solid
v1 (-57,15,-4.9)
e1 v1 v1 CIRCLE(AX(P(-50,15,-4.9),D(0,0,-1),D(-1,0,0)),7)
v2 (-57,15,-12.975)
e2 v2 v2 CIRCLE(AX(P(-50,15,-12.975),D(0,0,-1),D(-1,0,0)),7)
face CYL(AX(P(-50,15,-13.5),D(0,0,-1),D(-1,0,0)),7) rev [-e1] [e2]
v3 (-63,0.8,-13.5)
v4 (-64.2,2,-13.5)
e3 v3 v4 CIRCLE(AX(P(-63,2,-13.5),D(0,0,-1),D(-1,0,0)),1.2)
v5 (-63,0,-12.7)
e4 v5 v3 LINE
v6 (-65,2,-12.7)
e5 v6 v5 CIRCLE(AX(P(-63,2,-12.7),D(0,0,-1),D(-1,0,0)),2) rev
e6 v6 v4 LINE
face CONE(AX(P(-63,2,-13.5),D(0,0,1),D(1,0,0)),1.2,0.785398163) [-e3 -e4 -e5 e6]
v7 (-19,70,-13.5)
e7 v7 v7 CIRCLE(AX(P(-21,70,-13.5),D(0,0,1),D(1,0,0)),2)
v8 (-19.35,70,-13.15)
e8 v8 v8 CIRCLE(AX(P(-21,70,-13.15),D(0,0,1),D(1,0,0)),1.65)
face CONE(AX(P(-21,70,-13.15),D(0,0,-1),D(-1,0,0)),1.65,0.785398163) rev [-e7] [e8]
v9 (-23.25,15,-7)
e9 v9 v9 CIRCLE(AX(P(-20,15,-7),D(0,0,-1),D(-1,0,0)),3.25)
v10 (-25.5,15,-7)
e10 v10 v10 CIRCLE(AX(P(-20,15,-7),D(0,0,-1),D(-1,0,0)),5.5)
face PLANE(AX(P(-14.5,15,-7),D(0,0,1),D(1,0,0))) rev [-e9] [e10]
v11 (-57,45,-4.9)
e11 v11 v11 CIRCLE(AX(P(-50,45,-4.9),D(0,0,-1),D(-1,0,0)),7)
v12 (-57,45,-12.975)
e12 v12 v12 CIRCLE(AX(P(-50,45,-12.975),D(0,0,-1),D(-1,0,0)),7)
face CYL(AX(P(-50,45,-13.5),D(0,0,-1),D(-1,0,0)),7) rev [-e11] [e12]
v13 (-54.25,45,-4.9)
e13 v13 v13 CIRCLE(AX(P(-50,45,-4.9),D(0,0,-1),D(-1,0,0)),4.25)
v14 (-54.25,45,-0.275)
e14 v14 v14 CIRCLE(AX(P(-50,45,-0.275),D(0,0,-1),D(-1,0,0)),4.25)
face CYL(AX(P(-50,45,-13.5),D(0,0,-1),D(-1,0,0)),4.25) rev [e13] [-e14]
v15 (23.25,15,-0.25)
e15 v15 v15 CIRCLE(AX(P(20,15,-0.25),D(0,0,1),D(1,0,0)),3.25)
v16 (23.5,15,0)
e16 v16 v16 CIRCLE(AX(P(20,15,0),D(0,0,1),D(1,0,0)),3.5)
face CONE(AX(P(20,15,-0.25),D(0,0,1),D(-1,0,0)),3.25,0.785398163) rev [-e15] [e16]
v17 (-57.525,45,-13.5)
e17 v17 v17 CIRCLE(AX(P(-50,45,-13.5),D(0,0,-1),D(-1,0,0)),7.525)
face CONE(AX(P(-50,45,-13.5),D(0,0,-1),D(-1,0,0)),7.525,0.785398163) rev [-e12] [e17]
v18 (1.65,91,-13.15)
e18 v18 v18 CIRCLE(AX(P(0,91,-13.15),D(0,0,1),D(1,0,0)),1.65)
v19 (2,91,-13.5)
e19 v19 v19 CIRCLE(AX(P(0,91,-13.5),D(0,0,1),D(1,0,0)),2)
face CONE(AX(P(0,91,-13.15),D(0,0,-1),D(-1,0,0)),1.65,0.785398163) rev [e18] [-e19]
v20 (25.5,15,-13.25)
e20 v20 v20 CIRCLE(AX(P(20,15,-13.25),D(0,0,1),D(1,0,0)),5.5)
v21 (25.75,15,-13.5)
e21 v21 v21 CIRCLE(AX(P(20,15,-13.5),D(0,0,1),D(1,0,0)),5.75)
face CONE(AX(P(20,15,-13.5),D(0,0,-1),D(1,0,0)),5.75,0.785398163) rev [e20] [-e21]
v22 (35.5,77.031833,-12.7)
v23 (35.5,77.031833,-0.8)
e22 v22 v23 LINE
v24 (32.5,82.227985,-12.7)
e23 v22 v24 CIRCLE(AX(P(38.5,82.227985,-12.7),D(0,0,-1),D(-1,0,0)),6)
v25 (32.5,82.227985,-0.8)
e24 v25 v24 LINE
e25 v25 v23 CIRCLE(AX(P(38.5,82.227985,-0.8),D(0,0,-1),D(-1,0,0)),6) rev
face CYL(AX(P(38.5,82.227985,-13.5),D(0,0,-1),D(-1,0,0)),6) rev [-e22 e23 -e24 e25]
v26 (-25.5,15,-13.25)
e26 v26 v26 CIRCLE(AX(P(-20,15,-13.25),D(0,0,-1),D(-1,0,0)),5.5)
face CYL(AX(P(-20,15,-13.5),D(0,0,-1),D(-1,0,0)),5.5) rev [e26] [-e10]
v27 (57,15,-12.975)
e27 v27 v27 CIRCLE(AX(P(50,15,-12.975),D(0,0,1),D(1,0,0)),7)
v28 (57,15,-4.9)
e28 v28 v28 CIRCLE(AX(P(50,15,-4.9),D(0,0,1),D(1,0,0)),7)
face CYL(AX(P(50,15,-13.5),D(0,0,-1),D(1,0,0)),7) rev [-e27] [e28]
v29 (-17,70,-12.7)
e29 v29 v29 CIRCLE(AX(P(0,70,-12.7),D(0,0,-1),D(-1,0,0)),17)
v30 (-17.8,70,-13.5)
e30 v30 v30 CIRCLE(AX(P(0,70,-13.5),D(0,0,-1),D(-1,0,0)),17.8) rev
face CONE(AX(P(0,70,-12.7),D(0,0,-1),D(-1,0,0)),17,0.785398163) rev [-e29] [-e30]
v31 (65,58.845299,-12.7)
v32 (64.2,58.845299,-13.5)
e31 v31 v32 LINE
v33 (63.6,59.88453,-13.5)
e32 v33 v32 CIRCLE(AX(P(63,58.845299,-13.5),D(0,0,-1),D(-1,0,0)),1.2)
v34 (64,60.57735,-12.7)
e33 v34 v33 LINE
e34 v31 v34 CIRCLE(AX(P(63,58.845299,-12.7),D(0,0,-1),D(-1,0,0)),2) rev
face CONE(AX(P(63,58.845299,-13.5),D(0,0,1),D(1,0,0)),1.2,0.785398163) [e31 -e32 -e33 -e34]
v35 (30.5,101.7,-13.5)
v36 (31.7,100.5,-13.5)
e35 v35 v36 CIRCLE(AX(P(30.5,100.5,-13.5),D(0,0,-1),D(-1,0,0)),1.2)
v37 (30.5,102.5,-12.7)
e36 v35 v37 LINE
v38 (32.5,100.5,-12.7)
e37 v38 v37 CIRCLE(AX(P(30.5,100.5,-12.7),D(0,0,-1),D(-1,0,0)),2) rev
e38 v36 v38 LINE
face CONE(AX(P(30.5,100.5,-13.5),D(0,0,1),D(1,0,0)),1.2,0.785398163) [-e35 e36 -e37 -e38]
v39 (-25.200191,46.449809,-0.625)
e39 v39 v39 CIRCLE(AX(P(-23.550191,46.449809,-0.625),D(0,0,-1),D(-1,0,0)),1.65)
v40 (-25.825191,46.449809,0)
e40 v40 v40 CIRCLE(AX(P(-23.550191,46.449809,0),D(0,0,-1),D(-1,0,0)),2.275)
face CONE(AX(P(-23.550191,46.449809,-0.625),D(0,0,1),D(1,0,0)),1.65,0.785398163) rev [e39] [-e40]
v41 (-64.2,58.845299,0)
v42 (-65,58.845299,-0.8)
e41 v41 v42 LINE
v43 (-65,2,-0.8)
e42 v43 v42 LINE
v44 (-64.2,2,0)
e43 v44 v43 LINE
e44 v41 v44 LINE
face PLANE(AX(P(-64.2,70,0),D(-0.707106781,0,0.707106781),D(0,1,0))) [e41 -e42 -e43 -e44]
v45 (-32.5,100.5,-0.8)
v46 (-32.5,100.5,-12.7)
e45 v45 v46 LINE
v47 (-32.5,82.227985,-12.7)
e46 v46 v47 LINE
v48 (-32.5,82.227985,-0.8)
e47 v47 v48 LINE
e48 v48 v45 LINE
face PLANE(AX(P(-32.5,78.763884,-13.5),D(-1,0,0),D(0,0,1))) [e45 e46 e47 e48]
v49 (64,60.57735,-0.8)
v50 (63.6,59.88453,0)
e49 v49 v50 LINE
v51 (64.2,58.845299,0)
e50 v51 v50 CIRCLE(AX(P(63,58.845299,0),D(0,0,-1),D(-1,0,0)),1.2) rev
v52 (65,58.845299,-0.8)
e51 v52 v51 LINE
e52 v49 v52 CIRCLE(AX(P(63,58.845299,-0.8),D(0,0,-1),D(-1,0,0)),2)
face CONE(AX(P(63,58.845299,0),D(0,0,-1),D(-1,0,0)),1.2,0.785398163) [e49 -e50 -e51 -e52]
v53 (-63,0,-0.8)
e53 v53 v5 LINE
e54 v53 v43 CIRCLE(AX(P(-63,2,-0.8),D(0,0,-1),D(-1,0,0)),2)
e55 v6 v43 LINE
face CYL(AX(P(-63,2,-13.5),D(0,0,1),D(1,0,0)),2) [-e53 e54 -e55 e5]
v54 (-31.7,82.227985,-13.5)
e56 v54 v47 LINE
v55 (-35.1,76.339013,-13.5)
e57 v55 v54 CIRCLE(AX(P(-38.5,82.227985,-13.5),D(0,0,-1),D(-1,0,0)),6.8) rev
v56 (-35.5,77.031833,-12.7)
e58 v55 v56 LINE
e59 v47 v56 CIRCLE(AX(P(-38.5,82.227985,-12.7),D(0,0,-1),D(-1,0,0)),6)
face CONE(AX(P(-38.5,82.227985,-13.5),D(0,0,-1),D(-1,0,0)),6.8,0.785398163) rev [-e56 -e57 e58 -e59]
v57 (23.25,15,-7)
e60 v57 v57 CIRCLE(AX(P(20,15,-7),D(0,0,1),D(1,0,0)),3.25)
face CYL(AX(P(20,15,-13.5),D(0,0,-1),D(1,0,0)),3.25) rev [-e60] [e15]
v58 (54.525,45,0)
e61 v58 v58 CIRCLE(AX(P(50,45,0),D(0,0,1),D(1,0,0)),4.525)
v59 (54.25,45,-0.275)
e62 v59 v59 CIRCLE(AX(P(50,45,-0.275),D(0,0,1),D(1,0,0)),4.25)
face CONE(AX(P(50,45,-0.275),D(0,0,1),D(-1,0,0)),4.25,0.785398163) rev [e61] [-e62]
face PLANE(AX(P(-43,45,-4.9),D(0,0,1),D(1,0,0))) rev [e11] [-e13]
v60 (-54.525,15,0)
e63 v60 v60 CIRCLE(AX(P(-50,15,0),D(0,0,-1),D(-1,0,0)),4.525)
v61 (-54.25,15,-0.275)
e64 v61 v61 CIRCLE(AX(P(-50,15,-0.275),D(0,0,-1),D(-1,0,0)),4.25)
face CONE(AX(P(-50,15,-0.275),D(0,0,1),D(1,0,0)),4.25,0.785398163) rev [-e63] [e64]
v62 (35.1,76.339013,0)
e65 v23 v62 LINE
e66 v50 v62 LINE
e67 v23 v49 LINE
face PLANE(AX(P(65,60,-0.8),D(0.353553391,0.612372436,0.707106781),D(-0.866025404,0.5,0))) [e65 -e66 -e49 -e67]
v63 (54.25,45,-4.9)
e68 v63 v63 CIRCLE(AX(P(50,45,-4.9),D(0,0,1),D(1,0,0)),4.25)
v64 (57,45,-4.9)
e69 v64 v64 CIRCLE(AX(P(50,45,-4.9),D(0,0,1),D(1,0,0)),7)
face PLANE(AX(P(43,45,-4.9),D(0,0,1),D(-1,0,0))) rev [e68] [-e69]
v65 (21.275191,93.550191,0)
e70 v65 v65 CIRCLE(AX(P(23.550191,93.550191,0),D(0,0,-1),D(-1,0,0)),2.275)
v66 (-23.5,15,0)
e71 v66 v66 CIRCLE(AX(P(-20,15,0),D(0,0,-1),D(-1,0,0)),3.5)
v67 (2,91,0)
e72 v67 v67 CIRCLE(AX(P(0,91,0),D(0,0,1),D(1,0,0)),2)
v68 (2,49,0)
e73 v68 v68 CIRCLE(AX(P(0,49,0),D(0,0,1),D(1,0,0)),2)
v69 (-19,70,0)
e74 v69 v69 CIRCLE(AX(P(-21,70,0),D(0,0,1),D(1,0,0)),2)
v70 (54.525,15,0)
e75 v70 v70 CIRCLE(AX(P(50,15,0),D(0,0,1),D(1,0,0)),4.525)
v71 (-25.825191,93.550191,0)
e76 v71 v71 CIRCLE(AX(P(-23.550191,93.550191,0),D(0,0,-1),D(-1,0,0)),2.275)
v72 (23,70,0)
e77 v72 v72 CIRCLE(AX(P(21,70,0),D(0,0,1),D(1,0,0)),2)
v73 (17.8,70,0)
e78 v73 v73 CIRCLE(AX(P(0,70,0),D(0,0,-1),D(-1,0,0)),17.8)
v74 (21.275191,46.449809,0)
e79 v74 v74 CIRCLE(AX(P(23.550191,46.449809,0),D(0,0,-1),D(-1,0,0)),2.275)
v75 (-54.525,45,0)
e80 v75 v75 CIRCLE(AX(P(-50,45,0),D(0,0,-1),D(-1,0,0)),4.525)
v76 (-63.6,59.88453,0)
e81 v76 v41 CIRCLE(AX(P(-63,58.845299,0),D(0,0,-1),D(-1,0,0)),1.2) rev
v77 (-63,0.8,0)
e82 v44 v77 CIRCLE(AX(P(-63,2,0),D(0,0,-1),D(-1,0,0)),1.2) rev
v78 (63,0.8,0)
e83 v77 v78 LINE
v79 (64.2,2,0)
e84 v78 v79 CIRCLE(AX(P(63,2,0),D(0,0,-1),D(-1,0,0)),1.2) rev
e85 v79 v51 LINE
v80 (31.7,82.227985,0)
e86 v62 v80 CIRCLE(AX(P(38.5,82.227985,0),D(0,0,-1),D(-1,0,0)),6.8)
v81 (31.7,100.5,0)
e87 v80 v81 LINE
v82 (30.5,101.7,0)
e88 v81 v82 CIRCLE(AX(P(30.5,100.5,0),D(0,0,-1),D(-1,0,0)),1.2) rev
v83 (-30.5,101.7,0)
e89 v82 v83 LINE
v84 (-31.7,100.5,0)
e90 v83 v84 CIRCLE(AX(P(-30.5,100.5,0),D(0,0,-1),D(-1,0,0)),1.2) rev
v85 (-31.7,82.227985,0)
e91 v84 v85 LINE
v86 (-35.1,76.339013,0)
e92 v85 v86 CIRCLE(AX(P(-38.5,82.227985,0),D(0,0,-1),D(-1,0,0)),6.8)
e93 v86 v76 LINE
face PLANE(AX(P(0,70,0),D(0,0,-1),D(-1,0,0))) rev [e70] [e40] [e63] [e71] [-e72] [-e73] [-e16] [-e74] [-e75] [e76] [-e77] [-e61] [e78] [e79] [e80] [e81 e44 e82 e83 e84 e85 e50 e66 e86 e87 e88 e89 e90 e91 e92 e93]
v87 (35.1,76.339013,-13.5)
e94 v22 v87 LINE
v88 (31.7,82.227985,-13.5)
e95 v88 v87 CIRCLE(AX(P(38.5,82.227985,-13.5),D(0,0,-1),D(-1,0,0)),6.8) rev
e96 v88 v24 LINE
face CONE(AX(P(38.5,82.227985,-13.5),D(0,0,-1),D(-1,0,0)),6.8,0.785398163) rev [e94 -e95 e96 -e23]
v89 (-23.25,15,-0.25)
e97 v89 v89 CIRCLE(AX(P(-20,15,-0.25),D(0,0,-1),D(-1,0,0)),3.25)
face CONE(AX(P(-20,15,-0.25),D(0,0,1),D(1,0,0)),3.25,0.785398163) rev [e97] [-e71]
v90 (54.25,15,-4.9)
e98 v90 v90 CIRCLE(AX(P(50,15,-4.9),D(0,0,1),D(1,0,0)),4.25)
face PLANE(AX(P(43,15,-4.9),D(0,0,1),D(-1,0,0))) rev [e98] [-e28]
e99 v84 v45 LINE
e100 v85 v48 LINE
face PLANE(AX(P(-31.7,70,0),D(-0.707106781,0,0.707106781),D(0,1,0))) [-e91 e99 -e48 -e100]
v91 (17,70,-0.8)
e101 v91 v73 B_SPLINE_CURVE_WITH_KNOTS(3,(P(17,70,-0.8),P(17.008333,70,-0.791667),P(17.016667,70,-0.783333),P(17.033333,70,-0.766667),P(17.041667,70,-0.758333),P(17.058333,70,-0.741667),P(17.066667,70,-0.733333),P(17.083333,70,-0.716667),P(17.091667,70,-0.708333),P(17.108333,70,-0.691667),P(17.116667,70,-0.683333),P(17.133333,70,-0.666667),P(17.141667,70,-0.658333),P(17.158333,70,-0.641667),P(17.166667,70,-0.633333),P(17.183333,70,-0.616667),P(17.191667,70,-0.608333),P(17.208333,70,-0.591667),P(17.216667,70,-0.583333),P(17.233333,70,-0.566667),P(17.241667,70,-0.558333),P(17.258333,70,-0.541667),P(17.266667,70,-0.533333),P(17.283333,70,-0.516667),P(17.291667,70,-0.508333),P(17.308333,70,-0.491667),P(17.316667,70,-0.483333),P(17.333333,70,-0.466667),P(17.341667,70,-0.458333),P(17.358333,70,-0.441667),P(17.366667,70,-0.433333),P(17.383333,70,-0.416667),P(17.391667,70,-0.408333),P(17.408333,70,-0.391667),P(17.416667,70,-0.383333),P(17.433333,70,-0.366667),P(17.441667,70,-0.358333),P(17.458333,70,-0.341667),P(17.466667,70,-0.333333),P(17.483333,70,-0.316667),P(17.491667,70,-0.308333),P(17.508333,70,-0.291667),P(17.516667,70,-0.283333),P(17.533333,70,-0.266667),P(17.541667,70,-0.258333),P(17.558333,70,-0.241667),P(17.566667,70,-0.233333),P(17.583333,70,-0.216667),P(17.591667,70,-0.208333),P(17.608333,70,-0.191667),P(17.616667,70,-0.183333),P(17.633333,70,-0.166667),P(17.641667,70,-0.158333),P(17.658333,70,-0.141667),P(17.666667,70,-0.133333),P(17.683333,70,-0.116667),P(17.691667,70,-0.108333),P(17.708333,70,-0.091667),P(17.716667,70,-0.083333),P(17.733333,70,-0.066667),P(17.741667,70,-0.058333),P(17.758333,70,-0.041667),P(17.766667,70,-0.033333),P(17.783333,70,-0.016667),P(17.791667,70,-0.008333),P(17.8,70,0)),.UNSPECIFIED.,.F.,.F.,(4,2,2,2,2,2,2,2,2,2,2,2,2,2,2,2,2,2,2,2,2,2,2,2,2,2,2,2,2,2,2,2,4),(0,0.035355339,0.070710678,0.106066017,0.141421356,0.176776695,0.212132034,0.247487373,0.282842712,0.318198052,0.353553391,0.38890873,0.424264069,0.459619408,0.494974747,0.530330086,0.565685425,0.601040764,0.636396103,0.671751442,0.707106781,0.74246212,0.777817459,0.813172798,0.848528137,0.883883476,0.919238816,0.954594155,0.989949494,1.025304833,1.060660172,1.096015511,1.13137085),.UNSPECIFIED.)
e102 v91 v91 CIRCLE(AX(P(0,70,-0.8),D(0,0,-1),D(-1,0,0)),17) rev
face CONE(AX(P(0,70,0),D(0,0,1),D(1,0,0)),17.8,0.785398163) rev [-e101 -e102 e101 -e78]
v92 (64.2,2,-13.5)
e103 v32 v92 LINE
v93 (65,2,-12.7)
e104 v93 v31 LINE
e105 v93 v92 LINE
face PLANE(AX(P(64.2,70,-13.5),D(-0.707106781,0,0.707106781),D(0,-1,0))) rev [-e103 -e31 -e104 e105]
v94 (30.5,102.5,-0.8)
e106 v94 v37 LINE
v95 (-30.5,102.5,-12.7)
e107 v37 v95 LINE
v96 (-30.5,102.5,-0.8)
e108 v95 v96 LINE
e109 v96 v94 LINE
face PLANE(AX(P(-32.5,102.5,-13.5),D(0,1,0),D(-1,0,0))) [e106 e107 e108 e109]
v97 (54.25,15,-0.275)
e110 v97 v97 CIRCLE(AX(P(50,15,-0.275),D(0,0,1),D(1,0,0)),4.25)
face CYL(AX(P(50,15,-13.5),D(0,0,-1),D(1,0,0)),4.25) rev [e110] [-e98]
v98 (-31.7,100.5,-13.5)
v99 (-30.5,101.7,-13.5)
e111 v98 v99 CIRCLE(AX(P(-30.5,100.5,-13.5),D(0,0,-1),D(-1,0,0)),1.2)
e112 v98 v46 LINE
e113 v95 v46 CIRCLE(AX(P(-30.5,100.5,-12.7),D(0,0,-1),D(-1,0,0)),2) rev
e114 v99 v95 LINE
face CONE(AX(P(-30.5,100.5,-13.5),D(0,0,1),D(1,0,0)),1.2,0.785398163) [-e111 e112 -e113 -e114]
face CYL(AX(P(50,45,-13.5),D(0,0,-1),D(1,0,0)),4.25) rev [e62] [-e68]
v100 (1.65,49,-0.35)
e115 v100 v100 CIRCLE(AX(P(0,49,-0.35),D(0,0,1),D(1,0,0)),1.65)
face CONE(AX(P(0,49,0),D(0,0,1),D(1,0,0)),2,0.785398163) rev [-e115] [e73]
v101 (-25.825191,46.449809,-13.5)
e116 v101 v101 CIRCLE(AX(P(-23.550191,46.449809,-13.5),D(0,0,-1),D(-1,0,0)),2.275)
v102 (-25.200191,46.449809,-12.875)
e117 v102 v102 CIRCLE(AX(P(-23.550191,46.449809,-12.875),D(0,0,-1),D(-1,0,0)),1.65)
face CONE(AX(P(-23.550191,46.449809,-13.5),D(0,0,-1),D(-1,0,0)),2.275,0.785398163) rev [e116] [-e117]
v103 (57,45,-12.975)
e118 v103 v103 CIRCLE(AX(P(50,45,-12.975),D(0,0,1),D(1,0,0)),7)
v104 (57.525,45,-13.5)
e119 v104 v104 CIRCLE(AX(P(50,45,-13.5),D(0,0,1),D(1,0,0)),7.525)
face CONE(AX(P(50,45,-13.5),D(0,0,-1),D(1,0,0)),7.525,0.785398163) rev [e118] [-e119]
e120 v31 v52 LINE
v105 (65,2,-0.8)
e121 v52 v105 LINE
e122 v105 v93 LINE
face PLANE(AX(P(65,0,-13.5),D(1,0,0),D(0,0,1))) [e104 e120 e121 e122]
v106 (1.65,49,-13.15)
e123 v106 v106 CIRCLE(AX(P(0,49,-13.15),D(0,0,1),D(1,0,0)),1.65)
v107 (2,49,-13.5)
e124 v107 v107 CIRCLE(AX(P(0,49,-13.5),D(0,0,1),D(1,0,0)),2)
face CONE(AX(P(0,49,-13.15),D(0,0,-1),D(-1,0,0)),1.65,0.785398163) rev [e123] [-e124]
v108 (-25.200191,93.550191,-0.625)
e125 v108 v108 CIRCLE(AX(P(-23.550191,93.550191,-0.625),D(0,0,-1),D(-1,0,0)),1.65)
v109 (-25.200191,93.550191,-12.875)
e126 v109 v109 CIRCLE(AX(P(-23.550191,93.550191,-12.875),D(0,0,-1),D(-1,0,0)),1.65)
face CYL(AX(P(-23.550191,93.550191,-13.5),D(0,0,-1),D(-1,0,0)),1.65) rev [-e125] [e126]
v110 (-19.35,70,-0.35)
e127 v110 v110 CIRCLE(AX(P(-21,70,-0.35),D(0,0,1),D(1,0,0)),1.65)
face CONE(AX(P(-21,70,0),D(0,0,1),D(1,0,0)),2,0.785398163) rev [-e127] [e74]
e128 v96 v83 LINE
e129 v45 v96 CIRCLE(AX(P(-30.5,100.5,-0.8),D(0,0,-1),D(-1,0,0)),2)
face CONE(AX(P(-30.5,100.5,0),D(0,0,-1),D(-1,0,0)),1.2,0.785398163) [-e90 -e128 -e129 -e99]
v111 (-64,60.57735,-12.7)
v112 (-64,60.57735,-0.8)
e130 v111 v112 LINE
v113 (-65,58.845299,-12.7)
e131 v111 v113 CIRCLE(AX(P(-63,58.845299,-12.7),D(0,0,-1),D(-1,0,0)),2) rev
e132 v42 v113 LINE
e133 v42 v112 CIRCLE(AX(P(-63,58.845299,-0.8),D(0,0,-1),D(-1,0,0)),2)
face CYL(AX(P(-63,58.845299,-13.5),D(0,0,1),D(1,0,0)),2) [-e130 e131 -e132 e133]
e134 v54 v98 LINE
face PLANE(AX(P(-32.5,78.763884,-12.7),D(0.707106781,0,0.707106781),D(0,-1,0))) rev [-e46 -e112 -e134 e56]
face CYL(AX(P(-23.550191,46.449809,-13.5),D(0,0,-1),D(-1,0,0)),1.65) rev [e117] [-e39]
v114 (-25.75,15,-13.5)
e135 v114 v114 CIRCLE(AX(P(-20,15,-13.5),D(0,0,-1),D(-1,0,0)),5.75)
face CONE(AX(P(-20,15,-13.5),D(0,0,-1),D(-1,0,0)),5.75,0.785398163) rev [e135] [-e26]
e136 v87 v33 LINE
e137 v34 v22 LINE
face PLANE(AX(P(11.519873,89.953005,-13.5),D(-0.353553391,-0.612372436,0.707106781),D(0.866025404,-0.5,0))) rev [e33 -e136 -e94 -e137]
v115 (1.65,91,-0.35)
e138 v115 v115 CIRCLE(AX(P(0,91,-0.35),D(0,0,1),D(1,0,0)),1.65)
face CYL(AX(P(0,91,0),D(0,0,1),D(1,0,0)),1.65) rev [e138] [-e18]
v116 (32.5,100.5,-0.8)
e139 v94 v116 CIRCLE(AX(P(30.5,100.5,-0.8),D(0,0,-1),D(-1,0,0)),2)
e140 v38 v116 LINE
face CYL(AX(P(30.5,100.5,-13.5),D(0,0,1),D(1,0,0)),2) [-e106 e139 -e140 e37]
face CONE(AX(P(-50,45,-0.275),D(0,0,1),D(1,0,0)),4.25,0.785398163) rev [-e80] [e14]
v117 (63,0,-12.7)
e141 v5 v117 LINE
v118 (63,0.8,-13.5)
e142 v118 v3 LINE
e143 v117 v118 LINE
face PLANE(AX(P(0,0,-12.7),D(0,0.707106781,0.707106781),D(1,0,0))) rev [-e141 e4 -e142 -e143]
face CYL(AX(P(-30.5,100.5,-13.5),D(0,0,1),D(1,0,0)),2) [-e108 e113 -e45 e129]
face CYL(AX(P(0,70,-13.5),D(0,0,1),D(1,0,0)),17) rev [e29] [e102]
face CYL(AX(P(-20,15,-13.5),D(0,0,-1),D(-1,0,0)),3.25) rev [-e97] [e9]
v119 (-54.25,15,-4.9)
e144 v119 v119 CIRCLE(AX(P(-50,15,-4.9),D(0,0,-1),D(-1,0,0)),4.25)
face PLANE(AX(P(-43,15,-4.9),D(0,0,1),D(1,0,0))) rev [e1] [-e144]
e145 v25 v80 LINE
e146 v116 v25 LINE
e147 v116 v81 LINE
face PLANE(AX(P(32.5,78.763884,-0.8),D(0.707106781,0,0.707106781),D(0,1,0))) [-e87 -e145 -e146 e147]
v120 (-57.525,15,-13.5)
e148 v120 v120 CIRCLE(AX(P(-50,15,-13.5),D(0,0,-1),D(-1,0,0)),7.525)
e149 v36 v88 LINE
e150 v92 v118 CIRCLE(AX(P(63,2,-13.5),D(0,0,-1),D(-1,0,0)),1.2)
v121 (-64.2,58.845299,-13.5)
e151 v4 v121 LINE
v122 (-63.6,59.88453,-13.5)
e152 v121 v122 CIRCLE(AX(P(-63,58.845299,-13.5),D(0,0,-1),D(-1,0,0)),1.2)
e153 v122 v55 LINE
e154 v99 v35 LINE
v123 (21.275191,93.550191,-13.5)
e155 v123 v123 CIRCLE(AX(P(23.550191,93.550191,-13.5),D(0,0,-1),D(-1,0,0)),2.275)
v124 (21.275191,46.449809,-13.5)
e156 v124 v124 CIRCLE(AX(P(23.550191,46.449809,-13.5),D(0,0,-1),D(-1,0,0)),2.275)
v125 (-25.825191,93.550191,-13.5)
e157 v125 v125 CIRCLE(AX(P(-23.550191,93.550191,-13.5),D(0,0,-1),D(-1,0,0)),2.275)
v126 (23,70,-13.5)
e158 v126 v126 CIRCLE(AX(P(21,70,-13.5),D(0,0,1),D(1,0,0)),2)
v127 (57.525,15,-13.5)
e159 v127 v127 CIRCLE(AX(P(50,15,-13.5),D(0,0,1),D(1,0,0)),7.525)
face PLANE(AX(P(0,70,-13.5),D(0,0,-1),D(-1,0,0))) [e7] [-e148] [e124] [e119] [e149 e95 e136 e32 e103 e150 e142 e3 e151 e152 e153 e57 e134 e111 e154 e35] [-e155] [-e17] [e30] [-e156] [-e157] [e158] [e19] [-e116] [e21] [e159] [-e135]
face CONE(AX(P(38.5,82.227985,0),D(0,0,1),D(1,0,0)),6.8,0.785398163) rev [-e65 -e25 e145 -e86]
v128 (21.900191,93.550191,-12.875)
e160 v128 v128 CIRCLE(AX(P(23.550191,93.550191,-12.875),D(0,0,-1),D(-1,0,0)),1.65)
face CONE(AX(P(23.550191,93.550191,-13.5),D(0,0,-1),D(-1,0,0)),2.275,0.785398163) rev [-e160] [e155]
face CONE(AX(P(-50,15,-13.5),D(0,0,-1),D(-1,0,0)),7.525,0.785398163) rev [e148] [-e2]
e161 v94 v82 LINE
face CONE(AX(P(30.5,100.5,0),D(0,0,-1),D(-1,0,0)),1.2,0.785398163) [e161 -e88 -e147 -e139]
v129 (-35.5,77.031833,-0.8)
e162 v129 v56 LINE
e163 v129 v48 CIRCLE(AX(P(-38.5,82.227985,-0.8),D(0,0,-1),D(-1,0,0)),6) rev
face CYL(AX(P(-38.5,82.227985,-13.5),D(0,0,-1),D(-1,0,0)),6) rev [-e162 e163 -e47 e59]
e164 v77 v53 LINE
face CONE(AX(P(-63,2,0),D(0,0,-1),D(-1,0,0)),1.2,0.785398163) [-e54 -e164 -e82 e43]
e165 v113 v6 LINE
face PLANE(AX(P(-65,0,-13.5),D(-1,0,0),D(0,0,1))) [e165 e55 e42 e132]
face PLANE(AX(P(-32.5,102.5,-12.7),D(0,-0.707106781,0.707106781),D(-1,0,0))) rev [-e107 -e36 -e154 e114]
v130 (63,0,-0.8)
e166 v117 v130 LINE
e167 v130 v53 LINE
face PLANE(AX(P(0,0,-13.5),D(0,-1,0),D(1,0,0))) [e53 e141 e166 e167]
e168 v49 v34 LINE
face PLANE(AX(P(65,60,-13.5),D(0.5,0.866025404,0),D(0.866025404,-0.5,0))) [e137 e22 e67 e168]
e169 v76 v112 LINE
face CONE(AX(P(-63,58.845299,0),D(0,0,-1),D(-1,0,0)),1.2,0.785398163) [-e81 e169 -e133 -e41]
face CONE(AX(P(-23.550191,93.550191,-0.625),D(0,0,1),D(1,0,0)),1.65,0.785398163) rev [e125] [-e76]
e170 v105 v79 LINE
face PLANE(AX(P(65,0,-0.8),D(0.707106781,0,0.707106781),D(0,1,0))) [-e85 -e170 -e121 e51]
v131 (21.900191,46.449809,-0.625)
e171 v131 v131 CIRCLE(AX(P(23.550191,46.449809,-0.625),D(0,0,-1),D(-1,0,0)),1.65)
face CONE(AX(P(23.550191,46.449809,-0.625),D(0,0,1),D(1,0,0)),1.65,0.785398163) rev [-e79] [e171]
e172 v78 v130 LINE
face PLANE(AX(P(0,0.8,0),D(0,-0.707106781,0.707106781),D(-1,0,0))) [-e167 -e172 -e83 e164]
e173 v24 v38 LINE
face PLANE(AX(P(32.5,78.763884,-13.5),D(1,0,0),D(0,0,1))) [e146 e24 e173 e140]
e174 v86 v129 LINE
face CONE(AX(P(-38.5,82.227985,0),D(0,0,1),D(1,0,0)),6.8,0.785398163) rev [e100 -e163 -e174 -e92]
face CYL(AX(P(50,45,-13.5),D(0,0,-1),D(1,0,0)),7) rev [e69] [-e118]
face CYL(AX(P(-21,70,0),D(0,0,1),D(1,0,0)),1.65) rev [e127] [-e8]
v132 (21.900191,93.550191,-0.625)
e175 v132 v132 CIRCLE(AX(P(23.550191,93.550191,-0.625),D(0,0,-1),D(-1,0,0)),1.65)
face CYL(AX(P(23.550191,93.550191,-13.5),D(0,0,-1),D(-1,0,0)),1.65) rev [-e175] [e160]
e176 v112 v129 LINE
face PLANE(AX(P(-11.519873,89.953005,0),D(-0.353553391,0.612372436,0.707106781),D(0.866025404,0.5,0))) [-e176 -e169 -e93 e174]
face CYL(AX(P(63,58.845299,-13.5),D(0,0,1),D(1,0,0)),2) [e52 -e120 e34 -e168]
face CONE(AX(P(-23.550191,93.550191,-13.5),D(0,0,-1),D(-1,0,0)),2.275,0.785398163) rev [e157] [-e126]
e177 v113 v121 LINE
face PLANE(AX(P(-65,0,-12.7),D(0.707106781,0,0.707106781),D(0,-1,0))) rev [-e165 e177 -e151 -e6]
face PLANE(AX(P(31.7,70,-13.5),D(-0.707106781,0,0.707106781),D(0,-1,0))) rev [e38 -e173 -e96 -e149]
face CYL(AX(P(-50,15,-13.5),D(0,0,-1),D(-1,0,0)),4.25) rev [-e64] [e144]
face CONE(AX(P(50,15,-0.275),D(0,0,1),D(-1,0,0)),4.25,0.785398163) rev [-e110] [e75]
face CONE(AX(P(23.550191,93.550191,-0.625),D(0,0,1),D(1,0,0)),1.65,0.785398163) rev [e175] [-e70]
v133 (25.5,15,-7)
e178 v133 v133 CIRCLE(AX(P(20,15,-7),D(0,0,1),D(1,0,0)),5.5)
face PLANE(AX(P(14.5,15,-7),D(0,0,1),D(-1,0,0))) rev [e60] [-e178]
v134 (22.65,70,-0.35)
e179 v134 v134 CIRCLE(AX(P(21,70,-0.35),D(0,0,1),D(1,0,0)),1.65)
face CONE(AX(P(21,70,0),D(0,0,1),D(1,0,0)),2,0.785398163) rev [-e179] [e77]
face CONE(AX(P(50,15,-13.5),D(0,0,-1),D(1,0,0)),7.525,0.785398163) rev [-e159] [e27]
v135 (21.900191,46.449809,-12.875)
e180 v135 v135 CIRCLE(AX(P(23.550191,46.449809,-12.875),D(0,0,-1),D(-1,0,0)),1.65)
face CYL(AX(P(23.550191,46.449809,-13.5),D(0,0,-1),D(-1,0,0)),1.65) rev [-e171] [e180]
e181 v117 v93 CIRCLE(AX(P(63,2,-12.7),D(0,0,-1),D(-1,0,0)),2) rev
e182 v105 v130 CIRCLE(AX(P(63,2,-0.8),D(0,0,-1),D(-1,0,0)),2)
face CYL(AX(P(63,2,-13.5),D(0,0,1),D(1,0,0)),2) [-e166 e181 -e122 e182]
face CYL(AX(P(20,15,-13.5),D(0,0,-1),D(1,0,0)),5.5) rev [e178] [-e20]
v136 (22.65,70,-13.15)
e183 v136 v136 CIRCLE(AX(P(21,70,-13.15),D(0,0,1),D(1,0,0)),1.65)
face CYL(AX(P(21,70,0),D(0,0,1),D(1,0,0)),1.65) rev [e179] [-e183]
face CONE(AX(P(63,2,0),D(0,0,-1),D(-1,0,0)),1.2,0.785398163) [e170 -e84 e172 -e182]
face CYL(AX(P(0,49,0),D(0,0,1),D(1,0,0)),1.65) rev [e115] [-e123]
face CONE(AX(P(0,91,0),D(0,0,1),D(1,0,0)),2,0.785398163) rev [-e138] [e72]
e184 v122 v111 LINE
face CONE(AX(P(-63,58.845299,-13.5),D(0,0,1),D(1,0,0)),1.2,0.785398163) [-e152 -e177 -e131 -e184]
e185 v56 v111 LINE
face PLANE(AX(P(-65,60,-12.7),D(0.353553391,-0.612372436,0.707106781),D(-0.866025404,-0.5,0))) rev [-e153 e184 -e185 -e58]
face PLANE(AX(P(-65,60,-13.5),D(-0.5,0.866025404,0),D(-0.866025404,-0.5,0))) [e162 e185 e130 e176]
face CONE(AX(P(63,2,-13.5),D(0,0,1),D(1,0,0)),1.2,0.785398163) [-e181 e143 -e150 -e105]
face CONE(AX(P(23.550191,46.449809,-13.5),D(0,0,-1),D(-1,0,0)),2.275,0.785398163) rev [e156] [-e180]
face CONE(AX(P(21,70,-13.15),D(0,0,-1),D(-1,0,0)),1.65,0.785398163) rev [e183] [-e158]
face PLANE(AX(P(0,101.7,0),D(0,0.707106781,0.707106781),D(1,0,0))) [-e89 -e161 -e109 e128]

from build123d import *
from build123d.topology import SkipClean

# Parameters (mm, degrees)
BASE_FLANGE1_DEPTH                           = 13.5
CBORE_FOR_M8_HEX_SOCKET_HEAD_CAP_SCR_2_COUNT = 2
CBORE_FOR_M8_HEX_SOCKET_HEAD_CAP_SCR_2_PITCH = 30
M4_TAPPED_HOLE1_AT_2_COUNT                   = 2
M4_TAPPED_HOLE1_AT_2_PITCH                   = 29.69848481
M4_TAPPED_HOLE1_AT_3_COUNT                   = 2
M4_TAPPED_HOLE1_AT_3_PITCH                   = 42
M4_TAPPED_HOLE1_AT_4_COUNT                   = 2
M4_TAPPED_HOLE1_AT_4_PITCH                   = 29.69848481
CIRPATTERN1_COUNT                            = 4
FILLET2_R                                    = 6
FILLET1_R                                    = 2
CHAMFER1_SIZE                                = 0.8


# Sheet-metal steps are written as plain solids
with BuildPart() as part:
    # Sketch1 → Base-Flange1 (new body)
    with BuildSketch(Plane.XY):
        with BuildLine():
            Line((0, 0), (-65, 0))
            Line((-65, 0), (-65, 60))
            Line((-65, 60), (-32.5, 78.763883749))
            Line((-32.5, 78.763883749), (-32.5, 102.5))
            Line((-32.5, 102.5), (0, 102.5))
            Line((0, 102.5), (0, 87))
            ThreePointArc((0, 87), (-17, 70), (0, 53))
            Line((0, 53), (0, 0))
        make_face()
    extrude(amount=-BASE_FLANGE1_DEPTH)

    # Sketch7 → CBORE for M8 Hex Socket Head Cap Screw1 (revolve, cut)
    with BuildSketch(Plane(origin=(-50, 45, -13.5), x_dir=(0, 1, 0), z_dir=(1, 0, 0))):
        Polygon((0, 0), (0, 13.5), (4.525, 13.5), (4.25, 13.225), (4.25, 8.6), (7, 8.6), (7, 0.525), (7.525, 0), align=None)
    cbore_for_m8_hex_socket_head_cap_screw1 = revolve(axis=Axis((-50, 45, -19.85), (0, 0, 1)), mode=Mode.SUBTRACT)

    # CBORE for M8 Hex Socket Head Cap Scr 2: CBORE for M8 Hex Socket Head Cap Screw1 ×2
    with Locations(*[(0, -i * CBORE_FOR_M8_HEX_SOCKET_HEAD_CAP_SCR_2_PITCH, 0) for i in range(1, CBORE_FOR_M8_HEX_SOCKET_HEAD_CAP_SCR_2_COUNT)]):
        add(cbore_for_m8_hex_socket_head_cap_screw1, mode=Mode.SUBTRACT)

    # Sketch17 → CBORE for M6 Hex Socket Head Cap Screw1 (revolve, cut)
    with BuildSketch(Plane(origin=(-20, 15, -13.5), x_dir=(0, 1, 0), z_dir=(1, 0, 0))):
        Polygon((0, 0), (0, 13.5), (3.5, 13.5), (3.25, 13.25), (3.25, 6.5), (5.5, 6.5), (5.5, 0.25), (5.75, 0), align=None)
    revolve(axis=Axis((-20, 15, -19.85), (0, 0, 1)), mode=Mode.SUBTRACT)

    # Mirror1: part across plane


with BuildPart() as part_1:
    with SkipClean():  # the faces are left unmerged after this step: merging them gives an invalid solid
        add(part.part)
        add(part.part.mirror(Plane(origin=(0, 102.5, -13.5), x_dir=(0, 0, 1), z_dir=(1, 0, 0))))

    # Sketch12 → M4 Tapped Hole1 (revolve, cut)
    with SkipClean():  # the faces are left unmerged after this step: merging them gives an invalid solid
        with BuildSketch(Plane(origin=(-21, 70, 0), x_dir=(0, -1, 0), z_dir=(1, 0, 0))):
            Polygon((0, 0), (0, 13.5), (2, 13.5), (1.65, 13.15), (1.65, 0.35), (2, 0), align=None)
        m4_tapped_hole1 = revolve(axis=Axis((-21, 70, 6.35), (0, 0, -1)), mode=Mode.SUBTRACT)

    # M4 Tapped Hole1 at 2: M4 Tapped Hole1 ×2
    with SkipClean():  # the faces are left unmerged after this step: merging them gives an invalid solid
        with Locations(*[Vector(0.7071067811865477, 0.7071067811865474, 0) * (i * M4_TAPPED_HOLE1_AT_2_PITCH) for i in range(1, M4_TAPPED_HOLE1_AT_2_COUNT)]):
            add(m4_tapped_hole1, mode=Mode.SUBTRACT)

    # M4 Tapped Hole1 at 3: M4 Tapped Hole1 ×2
    with SkipClean():  # the faces are left unmerged after this step: merging them gives an invalid solid
        with Locations(*[(i * M4_TAPPED_HOLE1_AT_3_PITCH, 0, 0) for i in range(1, M4_TAPPED_HOLE1_AT_3_COUNT)]):
            add(m4_tapped_hole1, mode=Mode.SUBTRACT)

    # M4 Tapped Hole1 at 4: M4 Tapped Hole1 ×2
    with SkipClean():  # the faces are left unmerged after this step: merging them gives an invalid solid
        with Locations(*[Vector(0.7071067811865476, -0.7071067811865475, 0) * (i * M4_TAPPED_HOLE1_AT_4_PITCH) for i in range(1, M4_TAPPED_HOLE1_AT_4_COUNT)]):
            add(m4_tapped_hole1, mode=Mode.SUBTRACT)

    # Sketch15 → M4 Tapped Hole2 (revolve, cut)
    with SkipClean():  # the faces are left unmerged after this step: merging them gives an invalid solid
        with BuildSketch(Plane(origin=(23.550191347, 93.550191347, -13.5), x_dir=(0, 1, 0), z_dir=(1, 0, 0))):
            Polygon((0, 0), (0, 13.5), (2.275, 13.5), (1.65, 12.875), (1.65, 0.625), (2.275, 0), align=None)
        m4_tapped_hole2 = revolve(axis=Axis((23.550191347, 93.550191347, -19.85), (0, 0, 1)), mode=Mode.SUBTRACT)

    # CirPattern1: M4 Tapped Hole2 ×4 about axis
    with SkipClean():  # the faces are left unmerged after this step: merging them gives an invalid solid
        cirpattern1_axis = Axis((0, 70, 0), (0, 0, 1))
        for i in range(1, CIRPATTERN1_COUNT):
            add(m4_tapped_hole2.rotate(cirpattern1_axis, i * 360 / CIRPATTERN1_COUNT), mode=Mode.SUBTRACT)

    # Fillet2
    fillet2_edges = [part_1.edges().sort_by_distance(p)[0] for p in [
        (-32.5, 78.763883749, -6.75),
        (32.5, 78.763883749, -6.75),
    ]]
    fillet(fillet2_edges, radius=FILLET2_R)

    # Fillet1
    fillet1_edges = [part_1.edges().sort_by_distance(p)[0] for p in [
        (-65, 60, -6.75),
        (-32.5, 102.5, -6.75),
        (-65, 0, -6.75),
        (65, 60, -6.75),
        (32.5, 102.5, -6.75),
        (65, 0, -6.75),
    ]]
    fillet(fillet1_edges, radius=FILLET1_R)

    # Chamfer1
    chamfer1_edges = [part_1.edges().sort_by_distance(p)[0] for p in [
        (-17, 70, 0),
        (-17, 70, -13.5),
        (49.75, 68.804591605, 0),
        (49.75, 68.804591605, -13.5),
        (-49.75, 68.804591605, 0),
        (-49.75, 68.804591605, -13.5),
        (33.303847577, 79.227985364, 0),
        (33.303847577, 79.227985364, -13.5),
        (-33.303847577, 79.227985364, 0),
        (-33.303847577, 79.227985364, -13.5),
        (65, 30.422649731, 0),
        (65, 30.422649731, -13.5),
        (32.5, 91.363992682, 0),
        (-15.25, 102.5, 0),
        (-32.5, 91.363992682, 0),
        (-65, 30.422649731, 0),
        (-31.5, 0, 0),
        (-64.414213562, 0.585786438, 0),
        (64.414213562, 0.585786438, 0),
        (-31.914213562, 101.914213562, 0),
        (31.914213562, 101.914213562, 0),
        (-64.732050808, 59.845299462, 0),
        (64.732050808, 59.845299462, 0),
        (-15.25, 102.5, -13.5),
        (32.5, 91.363992682, -13.5),
        (-31.5, 0, -13.5),
        (-65, 30.422649731, -13.5),
        (-32.5, 91.363992682, -13.5),
        (-64.414213562, 0.585786438, -13.5),
        (64.414213562, 0.585786438, -13.5),
        (-31.914213562, 101.914213562, -13.5),
        (31.914213562, 101.914213562, -13.5),
        (-64.732050808, 59.845299462, -13.5),
        (64.732050808, 59.845299462, -13.5),
    ]]
    chamfer(chamfer1_edges, length=CHAMFER1_SIZE)


solid = part_1.part
